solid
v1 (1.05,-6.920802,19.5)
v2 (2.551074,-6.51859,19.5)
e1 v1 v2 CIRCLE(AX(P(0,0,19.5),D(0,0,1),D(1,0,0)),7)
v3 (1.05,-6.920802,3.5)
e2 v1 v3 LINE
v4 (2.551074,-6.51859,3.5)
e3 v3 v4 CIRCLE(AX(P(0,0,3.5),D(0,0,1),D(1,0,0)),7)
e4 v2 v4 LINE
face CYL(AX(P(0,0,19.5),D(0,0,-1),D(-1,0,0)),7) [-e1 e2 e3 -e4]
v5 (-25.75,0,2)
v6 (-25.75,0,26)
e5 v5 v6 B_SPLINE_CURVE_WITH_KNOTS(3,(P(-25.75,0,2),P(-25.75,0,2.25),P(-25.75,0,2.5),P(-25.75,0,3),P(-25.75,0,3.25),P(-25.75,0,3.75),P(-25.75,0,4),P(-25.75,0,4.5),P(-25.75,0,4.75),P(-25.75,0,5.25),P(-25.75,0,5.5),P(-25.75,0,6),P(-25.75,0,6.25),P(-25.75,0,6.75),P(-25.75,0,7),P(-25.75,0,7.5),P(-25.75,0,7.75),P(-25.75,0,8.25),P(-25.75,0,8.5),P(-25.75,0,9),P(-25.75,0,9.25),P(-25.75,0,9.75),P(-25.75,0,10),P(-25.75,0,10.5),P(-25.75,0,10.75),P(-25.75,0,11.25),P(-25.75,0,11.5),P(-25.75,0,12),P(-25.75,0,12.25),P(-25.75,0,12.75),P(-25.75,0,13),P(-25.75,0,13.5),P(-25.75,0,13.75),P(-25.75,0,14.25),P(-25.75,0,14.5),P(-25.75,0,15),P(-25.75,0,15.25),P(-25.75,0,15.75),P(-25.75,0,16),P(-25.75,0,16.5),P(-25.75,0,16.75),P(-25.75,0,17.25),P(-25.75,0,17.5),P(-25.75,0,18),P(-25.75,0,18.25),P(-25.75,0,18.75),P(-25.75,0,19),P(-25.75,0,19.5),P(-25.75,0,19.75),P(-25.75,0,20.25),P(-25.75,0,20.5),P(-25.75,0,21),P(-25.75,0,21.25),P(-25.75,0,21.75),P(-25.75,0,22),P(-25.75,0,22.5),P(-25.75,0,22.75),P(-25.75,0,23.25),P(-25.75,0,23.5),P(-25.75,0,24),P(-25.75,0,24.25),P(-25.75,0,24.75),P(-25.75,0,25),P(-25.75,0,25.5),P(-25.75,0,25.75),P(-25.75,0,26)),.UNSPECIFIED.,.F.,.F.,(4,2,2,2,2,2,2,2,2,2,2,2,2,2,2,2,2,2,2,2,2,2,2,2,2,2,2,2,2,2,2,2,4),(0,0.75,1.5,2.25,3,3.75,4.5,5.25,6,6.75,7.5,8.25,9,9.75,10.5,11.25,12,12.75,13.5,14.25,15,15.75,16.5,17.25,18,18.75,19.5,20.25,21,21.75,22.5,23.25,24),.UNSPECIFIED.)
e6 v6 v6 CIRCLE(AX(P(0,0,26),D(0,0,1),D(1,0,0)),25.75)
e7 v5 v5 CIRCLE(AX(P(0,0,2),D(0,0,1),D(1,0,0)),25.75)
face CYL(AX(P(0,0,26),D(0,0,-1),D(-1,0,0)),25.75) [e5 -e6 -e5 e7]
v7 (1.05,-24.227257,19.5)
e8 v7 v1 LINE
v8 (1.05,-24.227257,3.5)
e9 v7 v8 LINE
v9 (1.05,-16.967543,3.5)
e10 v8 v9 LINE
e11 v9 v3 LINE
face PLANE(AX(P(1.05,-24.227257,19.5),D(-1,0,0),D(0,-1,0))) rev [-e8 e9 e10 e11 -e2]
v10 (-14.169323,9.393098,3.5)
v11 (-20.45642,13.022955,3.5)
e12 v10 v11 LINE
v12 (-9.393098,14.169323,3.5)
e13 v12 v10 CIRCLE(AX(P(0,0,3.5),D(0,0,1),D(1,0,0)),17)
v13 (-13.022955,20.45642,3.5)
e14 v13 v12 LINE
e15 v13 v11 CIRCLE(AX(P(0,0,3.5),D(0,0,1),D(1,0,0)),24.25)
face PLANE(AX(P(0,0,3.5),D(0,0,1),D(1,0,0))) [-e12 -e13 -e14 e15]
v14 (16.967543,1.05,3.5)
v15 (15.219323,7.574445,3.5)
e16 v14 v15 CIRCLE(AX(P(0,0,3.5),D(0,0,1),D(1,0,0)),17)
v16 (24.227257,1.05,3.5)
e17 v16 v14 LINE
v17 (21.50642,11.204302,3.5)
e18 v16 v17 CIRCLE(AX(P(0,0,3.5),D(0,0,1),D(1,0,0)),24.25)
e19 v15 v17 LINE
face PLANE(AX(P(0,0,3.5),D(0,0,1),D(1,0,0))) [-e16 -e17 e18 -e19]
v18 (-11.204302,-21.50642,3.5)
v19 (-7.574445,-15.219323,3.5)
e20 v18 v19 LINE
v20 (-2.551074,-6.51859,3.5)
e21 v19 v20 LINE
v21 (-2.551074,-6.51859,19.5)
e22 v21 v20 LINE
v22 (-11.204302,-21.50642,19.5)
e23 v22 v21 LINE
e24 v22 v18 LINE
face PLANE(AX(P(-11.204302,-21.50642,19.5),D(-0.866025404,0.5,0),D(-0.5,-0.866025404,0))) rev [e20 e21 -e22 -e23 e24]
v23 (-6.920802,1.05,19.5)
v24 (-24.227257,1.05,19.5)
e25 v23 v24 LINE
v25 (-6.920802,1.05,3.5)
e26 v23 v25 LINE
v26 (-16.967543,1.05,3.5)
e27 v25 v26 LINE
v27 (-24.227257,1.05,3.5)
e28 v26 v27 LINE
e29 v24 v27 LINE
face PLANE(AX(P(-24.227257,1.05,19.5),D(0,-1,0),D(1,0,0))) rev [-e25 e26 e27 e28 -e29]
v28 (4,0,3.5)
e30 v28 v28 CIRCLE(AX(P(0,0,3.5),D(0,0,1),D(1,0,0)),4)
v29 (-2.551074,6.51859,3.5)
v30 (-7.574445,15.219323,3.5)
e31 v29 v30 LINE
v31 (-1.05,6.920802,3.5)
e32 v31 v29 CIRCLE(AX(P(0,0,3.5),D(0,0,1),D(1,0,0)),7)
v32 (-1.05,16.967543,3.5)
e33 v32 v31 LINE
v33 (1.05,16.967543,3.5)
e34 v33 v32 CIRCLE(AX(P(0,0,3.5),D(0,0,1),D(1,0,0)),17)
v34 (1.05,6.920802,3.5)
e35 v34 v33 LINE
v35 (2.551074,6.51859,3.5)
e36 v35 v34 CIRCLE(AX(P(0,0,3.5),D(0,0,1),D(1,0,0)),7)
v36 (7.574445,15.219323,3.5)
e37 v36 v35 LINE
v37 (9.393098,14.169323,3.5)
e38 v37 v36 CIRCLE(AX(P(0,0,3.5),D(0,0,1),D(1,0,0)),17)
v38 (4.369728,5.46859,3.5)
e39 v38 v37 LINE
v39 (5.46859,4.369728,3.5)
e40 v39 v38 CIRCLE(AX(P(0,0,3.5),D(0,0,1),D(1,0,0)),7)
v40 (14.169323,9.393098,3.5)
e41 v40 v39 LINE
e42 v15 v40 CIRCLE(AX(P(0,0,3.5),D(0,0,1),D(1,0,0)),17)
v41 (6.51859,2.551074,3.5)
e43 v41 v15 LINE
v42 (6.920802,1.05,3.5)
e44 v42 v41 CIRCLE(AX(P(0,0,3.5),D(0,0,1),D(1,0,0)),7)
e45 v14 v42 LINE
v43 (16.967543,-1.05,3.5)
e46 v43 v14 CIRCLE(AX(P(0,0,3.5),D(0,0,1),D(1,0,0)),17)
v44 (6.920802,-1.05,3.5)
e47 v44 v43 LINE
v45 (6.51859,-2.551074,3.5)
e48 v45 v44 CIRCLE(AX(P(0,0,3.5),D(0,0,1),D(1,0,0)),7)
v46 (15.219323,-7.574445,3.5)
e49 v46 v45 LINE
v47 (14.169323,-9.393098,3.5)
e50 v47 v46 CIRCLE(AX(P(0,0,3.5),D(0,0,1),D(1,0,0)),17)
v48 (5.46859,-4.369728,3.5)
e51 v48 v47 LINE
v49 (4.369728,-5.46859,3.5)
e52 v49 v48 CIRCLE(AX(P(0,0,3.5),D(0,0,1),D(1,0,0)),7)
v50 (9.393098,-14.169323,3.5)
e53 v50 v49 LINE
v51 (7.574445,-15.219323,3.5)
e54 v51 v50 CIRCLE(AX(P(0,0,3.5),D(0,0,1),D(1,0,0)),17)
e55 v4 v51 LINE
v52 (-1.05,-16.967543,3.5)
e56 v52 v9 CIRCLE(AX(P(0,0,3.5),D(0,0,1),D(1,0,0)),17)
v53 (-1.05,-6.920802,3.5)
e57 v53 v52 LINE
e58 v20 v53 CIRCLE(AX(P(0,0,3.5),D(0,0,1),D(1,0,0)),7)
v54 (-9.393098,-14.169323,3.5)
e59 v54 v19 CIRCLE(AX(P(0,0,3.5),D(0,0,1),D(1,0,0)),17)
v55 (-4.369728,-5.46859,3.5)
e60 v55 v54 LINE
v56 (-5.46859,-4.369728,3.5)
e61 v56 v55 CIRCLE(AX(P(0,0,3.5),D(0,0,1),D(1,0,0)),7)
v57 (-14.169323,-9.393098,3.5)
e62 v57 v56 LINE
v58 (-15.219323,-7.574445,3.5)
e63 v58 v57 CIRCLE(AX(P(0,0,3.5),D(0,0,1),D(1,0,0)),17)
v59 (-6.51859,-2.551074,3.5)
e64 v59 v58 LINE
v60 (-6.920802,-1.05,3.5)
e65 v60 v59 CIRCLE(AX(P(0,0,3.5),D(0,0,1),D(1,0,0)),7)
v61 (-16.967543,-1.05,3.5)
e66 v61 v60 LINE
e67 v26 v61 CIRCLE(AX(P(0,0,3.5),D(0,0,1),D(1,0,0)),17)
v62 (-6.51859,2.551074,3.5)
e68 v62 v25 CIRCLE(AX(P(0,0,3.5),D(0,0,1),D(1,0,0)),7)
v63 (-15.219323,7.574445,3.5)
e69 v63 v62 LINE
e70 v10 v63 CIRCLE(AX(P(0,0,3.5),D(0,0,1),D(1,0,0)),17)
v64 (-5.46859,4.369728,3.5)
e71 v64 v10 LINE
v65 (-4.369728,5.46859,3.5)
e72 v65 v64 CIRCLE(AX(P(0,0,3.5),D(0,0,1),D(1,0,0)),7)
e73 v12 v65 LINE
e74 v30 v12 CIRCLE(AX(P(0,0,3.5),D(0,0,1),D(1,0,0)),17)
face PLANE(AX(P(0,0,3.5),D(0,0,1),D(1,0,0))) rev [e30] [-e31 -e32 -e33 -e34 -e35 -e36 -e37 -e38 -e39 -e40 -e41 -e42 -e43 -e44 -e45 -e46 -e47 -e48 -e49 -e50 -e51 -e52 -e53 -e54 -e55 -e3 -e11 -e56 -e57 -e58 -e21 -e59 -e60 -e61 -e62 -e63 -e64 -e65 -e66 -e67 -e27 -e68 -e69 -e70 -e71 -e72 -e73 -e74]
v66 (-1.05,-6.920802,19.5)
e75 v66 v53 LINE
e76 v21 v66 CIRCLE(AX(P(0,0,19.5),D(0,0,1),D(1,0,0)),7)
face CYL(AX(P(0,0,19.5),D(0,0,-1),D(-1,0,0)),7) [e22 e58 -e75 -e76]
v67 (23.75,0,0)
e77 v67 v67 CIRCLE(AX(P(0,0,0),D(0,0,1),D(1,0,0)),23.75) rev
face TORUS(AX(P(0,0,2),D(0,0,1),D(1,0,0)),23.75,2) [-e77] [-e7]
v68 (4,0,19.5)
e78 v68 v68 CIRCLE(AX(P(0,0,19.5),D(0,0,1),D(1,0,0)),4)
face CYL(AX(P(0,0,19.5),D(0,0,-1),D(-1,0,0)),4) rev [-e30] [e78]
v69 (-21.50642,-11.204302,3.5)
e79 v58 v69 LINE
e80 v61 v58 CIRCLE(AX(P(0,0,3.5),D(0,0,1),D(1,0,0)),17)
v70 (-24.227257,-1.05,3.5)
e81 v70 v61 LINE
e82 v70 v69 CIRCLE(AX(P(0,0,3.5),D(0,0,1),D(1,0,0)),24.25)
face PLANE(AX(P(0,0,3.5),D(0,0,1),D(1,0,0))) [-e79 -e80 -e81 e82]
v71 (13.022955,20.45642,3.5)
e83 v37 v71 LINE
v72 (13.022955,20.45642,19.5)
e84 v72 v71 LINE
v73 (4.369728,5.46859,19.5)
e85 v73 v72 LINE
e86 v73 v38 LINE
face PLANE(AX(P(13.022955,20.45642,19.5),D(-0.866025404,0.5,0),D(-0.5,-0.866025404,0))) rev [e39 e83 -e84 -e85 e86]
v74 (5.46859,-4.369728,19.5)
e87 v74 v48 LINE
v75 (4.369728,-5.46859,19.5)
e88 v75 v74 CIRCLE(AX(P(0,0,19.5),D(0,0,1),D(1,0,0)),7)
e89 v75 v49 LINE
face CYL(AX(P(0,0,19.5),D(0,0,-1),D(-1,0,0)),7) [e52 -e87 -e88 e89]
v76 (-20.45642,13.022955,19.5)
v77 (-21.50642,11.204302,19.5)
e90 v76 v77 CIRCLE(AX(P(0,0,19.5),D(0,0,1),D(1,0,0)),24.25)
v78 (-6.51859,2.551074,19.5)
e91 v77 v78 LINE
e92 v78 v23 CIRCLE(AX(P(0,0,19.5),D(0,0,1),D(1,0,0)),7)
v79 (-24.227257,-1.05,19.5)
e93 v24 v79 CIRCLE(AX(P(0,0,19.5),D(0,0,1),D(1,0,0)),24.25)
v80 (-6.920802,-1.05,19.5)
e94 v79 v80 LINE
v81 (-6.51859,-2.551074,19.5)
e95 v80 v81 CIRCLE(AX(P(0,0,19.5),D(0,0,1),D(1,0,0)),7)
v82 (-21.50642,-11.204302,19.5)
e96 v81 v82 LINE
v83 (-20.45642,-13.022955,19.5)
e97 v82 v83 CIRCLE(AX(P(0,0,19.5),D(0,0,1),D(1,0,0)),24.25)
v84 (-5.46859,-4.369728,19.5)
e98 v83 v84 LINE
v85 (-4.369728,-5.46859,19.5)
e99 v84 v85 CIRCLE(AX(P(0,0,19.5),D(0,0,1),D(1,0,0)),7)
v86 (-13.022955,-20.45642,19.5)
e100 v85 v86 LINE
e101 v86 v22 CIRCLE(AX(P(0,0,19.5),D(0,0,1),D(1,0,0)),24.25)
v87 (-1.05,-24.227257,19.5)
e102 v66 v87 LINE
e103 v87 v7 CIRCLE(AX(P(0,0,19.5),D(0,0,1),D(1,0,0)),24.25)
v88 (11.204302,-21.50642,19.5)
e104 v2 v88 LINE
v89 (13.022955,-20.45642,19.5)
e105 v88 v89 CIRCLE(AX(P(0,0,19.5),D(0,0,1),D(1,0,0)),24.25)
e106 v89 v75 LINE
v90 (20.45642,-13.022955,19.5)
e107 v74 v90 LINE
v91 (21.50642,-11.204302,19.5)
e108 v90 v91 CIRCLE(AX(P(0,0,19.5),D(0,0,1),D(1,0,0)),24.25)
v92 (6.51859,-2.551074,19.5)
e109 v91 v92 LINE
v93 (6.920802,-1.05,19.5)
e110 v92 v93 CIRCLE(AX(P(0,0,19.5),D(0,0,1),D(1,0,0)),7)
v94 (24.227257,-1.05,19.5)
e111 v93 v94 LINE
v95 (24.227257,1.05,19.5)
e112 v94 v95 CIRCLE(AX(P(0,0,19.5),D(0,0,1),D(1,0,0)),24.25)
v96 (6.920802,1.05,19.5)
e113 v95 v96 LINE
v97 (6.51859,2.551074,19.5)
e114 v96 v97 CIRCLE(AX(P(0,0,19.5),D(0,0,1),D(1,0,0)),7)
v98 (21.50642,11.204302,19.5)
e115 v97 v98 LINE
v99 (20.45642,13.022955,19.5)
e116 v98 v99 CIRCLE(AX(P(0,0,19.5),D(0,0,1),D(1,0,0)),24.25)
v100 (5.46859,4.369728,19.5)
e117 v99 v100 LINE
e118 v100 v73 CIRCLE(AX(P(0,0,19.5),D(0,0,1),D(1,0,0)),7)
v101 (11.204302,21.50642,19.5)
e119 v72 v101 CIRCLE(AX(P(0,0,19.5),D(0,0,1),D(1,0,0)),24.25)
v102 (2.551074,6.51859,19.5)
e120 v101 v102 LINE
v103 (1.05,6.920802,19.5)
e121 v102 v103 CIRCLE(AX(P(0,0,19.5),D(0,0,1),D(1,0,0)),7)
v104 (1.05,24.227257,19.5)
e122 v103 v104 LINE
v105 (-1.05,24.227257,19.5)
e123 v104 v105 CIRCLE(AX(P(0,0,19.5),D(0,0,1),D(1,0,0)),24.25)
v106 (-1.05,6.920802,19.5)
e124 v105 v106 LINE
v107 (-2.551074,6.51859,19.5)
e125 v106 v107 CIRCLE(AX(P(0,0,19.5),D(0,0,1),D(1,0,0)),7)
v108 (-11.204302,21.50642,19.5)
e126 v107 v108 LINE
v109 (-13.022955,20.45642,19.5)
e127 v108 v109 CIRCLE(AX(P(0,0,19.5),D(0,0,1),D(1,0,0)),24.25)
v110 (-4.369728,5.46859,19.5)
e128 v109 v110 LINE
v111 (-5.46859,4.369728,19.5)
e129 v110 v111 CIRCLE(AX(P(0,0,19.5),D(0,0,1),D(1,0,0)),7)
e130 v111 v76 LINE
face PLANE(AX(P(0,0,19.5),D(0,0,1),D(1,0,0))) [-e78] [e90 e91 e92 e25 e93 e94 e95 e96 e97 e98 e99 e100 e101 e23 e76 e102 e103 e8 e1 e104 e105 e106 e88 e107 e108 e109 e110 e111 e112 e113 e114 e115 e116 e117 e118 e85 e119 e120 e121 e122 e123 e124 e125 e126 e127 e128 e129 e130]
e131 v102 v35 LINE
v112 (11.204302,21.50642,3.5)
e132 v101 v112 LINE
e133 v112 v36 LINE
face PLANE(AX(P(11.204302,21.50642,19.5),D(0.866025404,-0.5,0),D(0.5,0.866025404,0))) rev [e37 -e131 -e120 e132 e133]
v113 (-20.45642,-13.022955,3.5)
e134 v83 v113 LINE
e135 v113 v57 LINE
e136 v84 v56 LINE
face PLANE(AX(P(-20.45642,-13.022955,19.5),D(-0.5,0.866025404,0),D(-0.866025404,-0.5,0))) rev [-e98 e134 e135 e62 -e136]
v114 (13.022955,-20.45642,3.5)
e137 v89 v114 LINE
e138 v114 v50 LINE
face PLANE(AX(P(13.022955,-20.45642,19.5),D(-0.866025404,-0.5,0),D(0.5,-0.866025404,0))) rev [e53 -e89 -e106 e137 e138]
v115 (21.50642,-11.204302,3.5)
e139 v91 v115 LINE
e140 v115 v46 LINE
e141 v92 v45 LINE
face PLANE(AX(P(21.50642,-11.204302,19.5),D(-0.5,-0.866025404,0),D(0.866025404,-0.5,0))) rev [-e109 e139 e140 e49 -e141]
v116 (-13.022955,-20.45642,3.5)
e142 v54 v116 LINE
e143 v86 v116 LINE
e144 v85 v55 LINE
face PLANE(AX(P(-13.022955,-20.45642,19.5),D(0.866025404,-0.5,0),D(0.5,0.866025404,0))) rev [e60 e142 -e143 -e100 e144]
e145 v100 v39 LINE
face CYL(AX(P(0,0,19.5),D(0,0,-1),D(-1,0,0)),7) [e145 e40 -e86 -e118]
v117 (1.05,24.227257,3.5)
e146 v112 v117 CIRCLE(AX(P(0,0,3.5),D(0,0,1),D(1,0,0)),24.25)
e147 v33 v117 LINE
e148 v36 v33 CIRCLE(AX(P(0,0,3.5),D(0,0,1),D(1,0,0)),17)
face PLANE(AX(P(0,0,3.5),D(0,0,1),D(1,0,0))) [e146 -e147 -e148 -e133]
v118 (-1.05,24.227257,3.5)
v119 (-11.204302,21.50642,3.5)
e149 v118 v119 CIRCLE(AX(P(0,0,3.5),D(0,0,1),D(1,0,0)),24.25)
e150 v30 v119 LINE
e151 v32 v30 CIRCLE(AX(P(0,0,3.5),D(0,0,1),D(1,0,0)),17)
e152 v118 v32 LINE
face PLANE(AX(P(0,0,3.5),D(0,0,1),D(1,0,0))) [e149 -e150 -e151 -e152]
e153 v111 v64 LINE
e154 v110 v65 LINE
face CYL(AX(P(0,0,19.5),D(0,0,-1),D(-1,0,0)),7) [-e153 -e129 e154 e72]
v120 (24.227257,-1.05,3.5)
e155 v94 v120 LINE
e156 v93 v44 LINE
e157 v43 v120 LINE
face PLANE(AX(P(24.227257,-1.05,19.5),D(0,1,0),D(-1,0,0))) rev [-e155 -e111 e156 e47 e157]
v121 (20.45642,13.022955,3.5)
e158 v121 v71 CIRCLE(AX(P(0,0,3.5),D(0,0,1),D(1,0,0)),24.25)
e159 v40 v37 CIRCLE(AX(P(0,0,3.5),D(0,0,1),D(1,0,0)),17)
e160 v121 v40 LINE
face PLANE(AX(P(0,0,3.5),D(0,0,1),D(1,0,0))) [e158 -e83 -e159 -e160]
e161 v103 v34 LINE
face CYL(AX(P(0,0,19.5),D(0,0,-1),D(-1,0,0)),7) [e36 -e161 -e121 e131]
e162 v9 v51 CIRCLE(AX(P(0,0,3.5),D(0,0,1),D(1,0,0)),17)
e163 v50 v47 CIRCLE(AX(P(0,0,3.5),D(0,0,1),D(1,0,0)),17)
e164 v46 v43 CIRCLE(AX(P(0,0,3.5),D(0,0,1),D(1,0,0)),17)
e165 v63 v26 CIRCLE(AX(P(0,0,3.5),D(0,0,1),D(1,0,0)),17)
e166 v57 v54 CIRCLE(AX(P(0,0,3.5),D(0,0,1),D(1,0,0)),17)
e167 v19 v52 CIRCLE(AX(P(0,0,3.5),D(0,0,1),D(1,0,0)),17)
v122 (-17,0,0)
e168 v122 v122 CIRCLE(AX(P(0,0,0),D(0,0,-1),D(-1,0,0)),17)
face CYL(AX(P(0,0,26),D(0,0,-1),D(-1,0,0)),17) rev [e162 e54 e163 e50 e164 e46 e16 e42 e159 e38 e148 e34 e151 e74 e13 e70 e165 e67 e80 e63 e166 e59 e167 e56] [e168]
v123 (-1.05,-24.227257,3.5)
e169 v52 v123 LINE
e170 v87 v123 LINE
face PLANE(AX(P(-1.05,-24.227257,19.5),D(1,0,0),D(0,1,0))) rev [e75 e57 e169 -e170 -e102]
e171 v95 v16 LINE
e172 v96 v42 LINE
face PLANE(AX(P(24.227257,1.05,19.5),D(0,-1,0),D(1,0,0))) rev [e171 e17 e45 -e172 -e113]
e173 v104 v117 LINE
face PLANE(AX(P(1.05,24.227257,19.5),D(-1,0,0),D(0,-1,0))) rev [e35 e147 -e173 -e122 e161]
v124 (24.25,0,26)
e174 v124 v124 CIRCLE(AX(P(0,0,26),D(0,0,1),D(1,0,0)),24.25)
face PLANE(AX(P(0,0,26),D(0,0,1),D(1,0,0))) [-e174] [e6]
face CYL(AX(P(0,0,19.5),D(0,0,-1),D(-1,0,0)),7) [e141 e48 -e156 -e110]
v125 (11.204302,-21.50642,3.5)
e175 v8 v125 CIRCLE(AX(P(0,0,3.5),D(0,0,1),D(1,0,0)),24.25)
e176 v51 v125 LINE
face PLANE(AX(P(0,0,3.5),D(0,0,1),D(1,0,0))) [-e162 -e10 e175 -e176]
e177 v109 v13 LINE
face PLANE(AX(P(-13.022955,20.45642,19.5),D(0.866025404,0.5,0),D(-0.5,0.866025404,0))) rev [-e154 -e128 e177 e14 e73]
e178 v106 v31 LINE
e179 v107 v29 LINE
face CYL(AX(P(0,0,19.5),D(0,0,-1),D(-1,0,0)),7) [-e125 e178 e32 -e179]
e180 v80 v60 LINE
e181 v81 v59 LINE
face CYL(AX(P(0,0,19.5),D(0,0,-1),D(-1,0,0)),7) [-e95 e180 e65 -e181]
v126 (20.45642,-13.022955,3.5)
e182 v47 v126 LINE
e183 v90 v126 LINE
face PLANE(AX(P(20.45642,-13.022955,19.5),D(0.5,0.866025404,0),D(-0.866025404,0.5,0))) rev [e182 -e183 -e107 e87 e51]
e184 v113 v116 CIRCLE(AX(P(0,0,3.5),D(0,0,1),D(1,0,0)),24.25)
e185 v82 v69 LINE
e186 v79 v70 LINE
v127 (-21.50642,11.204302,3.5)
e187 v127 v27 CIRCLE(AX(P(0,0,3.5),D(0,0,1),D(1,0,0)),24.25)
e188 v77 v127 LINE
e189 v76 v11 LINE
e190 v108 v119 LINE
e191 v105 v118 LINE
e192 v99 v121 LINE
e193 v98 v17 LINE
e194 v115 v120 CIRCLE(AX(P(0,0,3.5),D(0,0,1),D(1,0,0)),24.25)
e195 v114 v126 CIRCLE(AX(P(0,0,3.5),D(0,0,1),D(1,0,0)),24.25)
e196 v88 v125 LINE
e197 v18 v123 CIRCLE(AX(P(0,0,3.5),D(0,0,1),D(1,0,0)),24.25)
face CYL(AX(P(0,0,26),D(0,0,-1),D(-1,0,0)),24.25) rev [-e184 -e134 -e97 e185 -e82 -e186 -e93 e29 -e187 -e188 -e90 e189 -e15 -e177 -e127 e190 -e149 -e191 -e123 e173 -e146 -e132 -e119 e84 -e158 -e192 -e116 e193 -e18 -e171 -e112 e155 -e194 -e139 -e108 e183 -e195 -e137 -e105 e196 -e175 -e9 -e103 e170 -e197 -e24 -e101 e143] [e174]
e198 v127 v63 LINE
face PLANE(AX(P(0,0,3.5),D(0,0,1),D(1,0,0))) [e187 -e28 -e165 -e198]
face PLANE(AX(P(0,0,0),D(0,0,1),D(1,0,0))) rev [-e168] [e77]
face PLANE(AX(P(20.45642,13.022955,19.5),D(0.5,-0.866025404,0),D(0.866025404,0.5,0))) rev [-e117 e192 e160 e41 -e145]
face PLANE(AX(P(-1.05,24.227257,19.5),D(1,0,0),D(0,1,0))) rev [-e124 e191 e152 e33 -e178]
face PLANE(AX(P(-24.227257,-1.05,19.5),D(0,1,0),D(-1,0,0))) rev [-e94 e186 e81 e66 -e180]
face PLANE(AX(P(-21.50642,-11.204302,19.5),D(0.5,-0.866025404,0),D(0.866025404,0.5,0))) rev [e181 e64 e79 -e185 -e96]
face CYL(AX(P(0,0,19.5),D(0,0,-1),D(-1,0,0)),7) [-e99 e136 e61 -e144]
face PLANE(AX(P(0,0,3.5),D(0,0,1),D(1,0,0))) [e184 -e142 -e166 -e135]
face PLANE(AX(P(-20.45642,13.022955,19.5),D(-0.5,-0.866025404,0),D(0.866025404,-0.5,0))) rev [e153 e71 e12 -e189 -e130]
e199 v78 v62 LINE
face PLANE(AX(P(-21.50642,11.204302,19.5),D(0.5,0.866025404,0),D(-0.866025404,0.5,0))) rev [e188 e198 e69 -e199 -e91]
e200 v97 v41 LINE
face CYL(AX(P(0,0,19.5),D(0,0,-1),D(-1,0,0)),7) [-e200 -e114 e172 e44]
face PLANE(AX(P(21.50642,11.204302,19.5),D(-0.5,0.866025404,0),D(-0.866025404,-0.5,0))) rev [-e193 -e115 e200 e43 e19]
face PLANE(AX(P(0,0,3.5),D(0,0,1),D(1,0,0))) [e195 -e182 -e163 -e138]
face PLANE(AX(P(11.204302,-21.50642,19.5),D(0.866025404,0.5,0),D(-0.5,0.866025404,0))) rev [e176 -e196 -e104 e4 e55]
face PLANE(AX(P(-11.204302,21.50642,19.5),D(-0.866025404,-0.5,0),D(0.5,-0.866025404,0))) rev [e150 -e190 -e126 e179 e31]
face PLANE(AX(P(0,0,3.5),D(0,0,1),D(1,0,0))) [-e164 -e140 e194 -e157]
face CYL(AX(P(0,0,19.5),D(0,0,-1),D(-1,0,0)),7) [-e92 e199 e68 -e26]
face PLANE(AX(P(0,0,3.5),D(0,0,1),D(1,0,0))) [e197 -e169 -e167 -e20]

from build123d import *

# Parameters (mm, degrees)
SKICA1_R                 = 25.75
P_IDAT_VYSUNUT_M1_DEPTH  = 26
SKO_EPINA1_START         = 3.5
SKO_EPINA1_OUTLINE_R     = 24.25
SKO_EPINA1_DEPTH         = 22.5
SKICA2_R                 = 17
ODEBRAT_VYSUNUT_M1_DEPTH = 45.745111465
ZAOBLIT1_R               = 2
SKICA3_R                 = 4
P_IDAT_VYSUNUT_M2_DEPTH  = 16


# Read off the part's stored shape, not the designer's step: Skořepina1
with BuildPart() as part:
    # Skica1 → Přidat vysunutím1 (new body)
    with BuildSketch(Plane.XY):
        with Locations(Location((0, 0, 0), (0, 0, 180))):
            Circle(SKICA1_R)
    extrude(amount=P_IDAT_VYSUNUT_M1_DEPTH)

    # Skořepina1 outline → Skořepina1 (cut)
    with BuildSketch(Plane.XY.offset(SKO_EPINA1_START)):
        Circle(SKO_EPINA1_OUTLINE_R)
    extrude(amount=SKO_EPINA1_DEPTH, mode=Mode.SUBTRACT)

    # Skica2 → Odebrat vysunutím1 (cut, through all)
    with BuildSketch(Plane(origin=(0, 0, 0), x_dir=(-1, 0, 0), z_dir=(0, 0, -1))):
        Circle(SKICA2_R)
    extrude(amount=-ODEBRAT_VYSUNUT_M1_DEPTH, mode=Mode.SUBTRACT)

    # Zaoblit1
    zaoblit1_edges = [part.edges().sort_by_distance(p)[0] for p in [
        (25.75, 0, 0),
    ]]
    fillet(zaoblit1_edges, radius=ZAOBLIT1_R)

    # Skica3 → Přidat vysunutím2 (add)
    with BuildSketch(Plane.XY.offset(3.5)):
        with BuildLine():
            Line((-1.05, 24.227257377), (-1.05, 6.920801977))
            ThreePointArc((-1.05, 6.920801977), (-1.811733316, 6.761480784), (-2.551074314, 6.518590326))
            Line((-2.551074314, 6.518590326), (-11.204302014, 21.506420352))
            ThreePointArc((-11.204302014, 21.506420352), (-12.125, 21.001116042), (-13.022955362, 20.456420352))
            Line((-13.022955362, 20.456420352), (-4.369727662, 5.468590326))
            ThreePointArc((-4.369727662, 5.468590326), (-4.949747468, 4.949747468), (-5.468590326, 4.369727662))
            Line((-5.468590326, 4.369727662), (-20.456420352, 13.022955362))
            ThreePointArc((-20.456420352, 13.022955362), (-21.001116042, 12.125), (-21.506420352, 11.204302014))
            Line((-21.506420352, 11.204302014), (-6.518590326, 2.551074314))
            ThreePointArc((-6.518590326, 2.551074314), (-6.761480784, 1.811733316), (-6.920801977, 1.05))
            Line((-6.920801977, 1.05), (-24.227257377, 1.05))
            ThreePointArc((-24.227257377, 1.05), (-24.25, 0), (-24.227257377, -1.05))
            Line((-24.227257377, -1.05), (-6.920801977, -1.05))
            ThreePointArc((-6.920801977, -1.05), (-6.761480784, -1.811733316), (-6.518590326, -2.551074314))
            Line((-6.518590326, -2.551074314), (-21.506420352, -11.204302014))
            ThreePointArc((-21.506420352, -11.204302014), (-21.001116042, -12.125), (-20.456420352, -13.022955362))
            Line((-20.456420352, -13.022955362), (-5.468590326, -4.369727662))
            ThreePointArc((-5.468590326, -4.369727662), (-4.949747468, -4.949747468), (-4.369727662, -5.468590326))
            Line((-4.369727662, -5.468590326), (-13.022955362, -20.456420352))
            ThreePointArc((-13.022955362, -20.456420352), (-12.125, -21.001116042), (-11.204302014, -21.506420352))
            Line((-11.204302014, -21.506420352), (-2.551074314, -6.518590326))
            ThreePointArc((-2.551074314, -6.518590326), (-1.811733316, -6.761480784), (-1.05, -6.920801977))
            Line((-1.05, -6.920801977), (-1.05, -24.227257377))
            ThreePointArc((-1.05, -24.227257377), (0, -24.25), (1.05, -24.227257377))
            Line((1.05, -24.227257377), (1.05, -6.920801977))
            ThreePointArc((1.05, -6.920801977), (1.811733316, -6.761480784), (2.551074314, -6.518590326))
            Line((2.551074314, -6.518590326), (11.204302014, -21.506420352))
            ThreePointArc((11.204302014, -21.506420352), (12.125, -21.001116042), (13.022955362, -20.456420352))
            Line((13.022955362, -20.456420352), (4.369727662, -5.468590326))
            ThreePointArc((4.369727662, -5.468590326), (4.949747468, -4.949747468), (5.468590326, -4.369727662))
            Line((5.468590326, -4.369727662), (20.456420352, -13.022955362))
            ThreePointArc((20.456420352, -13.022955362), (21.001116042, -12.125), (21.506420352, -11.204302014))
            Line((21.506420352, -11.204302014), (6.518590326, -2.551074314))
            ThreePointArc((6.518590326, -2.551074314), (6.761480784, -1.811733316), (6.920801977, -1.05))
            Line((6.920801977, -1.05), (24.227257377, -1.05))
            ThreePointArc((24.227257377, -1.05), (24.25, 0), (24.227257377, 1.05))
            Line((24.227257377, 1.05), (6.920801977, 1.05))
            ThreePointArc((6.920801977, 1.05), (6.761480784, 1.811733316), (6.518590326, 2.551074314))
            Line((6.518590326, 2.551074314), (21.506420352, 11.204302014))
            ThreePointArc((21.506420352, 11.204302014), (21.001116042, 12.125), (20.456420352, 13.022955362))
            Line((20.456420352, 13.022955362), (5.468590326, 4.369727662))
            ThreePointArc((5.468590326, 4.369727662), (4.949747468, 4.949747468), (4.369727662, 5.468590326))
            Line((4.369727662, 5.468590326), (13.022955362, 20.456420352))
            ThreePointArc((13.022955362, 20.456420352), (12.125, 21.001116042), (11.204302014, 21.506420352))
            Line((11.204302014, 21.506420352), (2.551074314, 6.518590326))
            ThreePointArc((2.551074314, 6.518590326), (1.811733316, 6.761480784), (1.05, 6.920801977))
            Line((1.05, 6.920801977), (1.05, 24.227257377))
            ThreePointArc((1.05, 24.227257377), (0, 24.25), (-1.05, 24.227257377))
        make_face()
        Circle(SKICA3_R, mode=Mode.SUBTRACT)
    extrude(amount=P_IDAT_VYSUNUT_M2_DEPTH)


solid = part.part
